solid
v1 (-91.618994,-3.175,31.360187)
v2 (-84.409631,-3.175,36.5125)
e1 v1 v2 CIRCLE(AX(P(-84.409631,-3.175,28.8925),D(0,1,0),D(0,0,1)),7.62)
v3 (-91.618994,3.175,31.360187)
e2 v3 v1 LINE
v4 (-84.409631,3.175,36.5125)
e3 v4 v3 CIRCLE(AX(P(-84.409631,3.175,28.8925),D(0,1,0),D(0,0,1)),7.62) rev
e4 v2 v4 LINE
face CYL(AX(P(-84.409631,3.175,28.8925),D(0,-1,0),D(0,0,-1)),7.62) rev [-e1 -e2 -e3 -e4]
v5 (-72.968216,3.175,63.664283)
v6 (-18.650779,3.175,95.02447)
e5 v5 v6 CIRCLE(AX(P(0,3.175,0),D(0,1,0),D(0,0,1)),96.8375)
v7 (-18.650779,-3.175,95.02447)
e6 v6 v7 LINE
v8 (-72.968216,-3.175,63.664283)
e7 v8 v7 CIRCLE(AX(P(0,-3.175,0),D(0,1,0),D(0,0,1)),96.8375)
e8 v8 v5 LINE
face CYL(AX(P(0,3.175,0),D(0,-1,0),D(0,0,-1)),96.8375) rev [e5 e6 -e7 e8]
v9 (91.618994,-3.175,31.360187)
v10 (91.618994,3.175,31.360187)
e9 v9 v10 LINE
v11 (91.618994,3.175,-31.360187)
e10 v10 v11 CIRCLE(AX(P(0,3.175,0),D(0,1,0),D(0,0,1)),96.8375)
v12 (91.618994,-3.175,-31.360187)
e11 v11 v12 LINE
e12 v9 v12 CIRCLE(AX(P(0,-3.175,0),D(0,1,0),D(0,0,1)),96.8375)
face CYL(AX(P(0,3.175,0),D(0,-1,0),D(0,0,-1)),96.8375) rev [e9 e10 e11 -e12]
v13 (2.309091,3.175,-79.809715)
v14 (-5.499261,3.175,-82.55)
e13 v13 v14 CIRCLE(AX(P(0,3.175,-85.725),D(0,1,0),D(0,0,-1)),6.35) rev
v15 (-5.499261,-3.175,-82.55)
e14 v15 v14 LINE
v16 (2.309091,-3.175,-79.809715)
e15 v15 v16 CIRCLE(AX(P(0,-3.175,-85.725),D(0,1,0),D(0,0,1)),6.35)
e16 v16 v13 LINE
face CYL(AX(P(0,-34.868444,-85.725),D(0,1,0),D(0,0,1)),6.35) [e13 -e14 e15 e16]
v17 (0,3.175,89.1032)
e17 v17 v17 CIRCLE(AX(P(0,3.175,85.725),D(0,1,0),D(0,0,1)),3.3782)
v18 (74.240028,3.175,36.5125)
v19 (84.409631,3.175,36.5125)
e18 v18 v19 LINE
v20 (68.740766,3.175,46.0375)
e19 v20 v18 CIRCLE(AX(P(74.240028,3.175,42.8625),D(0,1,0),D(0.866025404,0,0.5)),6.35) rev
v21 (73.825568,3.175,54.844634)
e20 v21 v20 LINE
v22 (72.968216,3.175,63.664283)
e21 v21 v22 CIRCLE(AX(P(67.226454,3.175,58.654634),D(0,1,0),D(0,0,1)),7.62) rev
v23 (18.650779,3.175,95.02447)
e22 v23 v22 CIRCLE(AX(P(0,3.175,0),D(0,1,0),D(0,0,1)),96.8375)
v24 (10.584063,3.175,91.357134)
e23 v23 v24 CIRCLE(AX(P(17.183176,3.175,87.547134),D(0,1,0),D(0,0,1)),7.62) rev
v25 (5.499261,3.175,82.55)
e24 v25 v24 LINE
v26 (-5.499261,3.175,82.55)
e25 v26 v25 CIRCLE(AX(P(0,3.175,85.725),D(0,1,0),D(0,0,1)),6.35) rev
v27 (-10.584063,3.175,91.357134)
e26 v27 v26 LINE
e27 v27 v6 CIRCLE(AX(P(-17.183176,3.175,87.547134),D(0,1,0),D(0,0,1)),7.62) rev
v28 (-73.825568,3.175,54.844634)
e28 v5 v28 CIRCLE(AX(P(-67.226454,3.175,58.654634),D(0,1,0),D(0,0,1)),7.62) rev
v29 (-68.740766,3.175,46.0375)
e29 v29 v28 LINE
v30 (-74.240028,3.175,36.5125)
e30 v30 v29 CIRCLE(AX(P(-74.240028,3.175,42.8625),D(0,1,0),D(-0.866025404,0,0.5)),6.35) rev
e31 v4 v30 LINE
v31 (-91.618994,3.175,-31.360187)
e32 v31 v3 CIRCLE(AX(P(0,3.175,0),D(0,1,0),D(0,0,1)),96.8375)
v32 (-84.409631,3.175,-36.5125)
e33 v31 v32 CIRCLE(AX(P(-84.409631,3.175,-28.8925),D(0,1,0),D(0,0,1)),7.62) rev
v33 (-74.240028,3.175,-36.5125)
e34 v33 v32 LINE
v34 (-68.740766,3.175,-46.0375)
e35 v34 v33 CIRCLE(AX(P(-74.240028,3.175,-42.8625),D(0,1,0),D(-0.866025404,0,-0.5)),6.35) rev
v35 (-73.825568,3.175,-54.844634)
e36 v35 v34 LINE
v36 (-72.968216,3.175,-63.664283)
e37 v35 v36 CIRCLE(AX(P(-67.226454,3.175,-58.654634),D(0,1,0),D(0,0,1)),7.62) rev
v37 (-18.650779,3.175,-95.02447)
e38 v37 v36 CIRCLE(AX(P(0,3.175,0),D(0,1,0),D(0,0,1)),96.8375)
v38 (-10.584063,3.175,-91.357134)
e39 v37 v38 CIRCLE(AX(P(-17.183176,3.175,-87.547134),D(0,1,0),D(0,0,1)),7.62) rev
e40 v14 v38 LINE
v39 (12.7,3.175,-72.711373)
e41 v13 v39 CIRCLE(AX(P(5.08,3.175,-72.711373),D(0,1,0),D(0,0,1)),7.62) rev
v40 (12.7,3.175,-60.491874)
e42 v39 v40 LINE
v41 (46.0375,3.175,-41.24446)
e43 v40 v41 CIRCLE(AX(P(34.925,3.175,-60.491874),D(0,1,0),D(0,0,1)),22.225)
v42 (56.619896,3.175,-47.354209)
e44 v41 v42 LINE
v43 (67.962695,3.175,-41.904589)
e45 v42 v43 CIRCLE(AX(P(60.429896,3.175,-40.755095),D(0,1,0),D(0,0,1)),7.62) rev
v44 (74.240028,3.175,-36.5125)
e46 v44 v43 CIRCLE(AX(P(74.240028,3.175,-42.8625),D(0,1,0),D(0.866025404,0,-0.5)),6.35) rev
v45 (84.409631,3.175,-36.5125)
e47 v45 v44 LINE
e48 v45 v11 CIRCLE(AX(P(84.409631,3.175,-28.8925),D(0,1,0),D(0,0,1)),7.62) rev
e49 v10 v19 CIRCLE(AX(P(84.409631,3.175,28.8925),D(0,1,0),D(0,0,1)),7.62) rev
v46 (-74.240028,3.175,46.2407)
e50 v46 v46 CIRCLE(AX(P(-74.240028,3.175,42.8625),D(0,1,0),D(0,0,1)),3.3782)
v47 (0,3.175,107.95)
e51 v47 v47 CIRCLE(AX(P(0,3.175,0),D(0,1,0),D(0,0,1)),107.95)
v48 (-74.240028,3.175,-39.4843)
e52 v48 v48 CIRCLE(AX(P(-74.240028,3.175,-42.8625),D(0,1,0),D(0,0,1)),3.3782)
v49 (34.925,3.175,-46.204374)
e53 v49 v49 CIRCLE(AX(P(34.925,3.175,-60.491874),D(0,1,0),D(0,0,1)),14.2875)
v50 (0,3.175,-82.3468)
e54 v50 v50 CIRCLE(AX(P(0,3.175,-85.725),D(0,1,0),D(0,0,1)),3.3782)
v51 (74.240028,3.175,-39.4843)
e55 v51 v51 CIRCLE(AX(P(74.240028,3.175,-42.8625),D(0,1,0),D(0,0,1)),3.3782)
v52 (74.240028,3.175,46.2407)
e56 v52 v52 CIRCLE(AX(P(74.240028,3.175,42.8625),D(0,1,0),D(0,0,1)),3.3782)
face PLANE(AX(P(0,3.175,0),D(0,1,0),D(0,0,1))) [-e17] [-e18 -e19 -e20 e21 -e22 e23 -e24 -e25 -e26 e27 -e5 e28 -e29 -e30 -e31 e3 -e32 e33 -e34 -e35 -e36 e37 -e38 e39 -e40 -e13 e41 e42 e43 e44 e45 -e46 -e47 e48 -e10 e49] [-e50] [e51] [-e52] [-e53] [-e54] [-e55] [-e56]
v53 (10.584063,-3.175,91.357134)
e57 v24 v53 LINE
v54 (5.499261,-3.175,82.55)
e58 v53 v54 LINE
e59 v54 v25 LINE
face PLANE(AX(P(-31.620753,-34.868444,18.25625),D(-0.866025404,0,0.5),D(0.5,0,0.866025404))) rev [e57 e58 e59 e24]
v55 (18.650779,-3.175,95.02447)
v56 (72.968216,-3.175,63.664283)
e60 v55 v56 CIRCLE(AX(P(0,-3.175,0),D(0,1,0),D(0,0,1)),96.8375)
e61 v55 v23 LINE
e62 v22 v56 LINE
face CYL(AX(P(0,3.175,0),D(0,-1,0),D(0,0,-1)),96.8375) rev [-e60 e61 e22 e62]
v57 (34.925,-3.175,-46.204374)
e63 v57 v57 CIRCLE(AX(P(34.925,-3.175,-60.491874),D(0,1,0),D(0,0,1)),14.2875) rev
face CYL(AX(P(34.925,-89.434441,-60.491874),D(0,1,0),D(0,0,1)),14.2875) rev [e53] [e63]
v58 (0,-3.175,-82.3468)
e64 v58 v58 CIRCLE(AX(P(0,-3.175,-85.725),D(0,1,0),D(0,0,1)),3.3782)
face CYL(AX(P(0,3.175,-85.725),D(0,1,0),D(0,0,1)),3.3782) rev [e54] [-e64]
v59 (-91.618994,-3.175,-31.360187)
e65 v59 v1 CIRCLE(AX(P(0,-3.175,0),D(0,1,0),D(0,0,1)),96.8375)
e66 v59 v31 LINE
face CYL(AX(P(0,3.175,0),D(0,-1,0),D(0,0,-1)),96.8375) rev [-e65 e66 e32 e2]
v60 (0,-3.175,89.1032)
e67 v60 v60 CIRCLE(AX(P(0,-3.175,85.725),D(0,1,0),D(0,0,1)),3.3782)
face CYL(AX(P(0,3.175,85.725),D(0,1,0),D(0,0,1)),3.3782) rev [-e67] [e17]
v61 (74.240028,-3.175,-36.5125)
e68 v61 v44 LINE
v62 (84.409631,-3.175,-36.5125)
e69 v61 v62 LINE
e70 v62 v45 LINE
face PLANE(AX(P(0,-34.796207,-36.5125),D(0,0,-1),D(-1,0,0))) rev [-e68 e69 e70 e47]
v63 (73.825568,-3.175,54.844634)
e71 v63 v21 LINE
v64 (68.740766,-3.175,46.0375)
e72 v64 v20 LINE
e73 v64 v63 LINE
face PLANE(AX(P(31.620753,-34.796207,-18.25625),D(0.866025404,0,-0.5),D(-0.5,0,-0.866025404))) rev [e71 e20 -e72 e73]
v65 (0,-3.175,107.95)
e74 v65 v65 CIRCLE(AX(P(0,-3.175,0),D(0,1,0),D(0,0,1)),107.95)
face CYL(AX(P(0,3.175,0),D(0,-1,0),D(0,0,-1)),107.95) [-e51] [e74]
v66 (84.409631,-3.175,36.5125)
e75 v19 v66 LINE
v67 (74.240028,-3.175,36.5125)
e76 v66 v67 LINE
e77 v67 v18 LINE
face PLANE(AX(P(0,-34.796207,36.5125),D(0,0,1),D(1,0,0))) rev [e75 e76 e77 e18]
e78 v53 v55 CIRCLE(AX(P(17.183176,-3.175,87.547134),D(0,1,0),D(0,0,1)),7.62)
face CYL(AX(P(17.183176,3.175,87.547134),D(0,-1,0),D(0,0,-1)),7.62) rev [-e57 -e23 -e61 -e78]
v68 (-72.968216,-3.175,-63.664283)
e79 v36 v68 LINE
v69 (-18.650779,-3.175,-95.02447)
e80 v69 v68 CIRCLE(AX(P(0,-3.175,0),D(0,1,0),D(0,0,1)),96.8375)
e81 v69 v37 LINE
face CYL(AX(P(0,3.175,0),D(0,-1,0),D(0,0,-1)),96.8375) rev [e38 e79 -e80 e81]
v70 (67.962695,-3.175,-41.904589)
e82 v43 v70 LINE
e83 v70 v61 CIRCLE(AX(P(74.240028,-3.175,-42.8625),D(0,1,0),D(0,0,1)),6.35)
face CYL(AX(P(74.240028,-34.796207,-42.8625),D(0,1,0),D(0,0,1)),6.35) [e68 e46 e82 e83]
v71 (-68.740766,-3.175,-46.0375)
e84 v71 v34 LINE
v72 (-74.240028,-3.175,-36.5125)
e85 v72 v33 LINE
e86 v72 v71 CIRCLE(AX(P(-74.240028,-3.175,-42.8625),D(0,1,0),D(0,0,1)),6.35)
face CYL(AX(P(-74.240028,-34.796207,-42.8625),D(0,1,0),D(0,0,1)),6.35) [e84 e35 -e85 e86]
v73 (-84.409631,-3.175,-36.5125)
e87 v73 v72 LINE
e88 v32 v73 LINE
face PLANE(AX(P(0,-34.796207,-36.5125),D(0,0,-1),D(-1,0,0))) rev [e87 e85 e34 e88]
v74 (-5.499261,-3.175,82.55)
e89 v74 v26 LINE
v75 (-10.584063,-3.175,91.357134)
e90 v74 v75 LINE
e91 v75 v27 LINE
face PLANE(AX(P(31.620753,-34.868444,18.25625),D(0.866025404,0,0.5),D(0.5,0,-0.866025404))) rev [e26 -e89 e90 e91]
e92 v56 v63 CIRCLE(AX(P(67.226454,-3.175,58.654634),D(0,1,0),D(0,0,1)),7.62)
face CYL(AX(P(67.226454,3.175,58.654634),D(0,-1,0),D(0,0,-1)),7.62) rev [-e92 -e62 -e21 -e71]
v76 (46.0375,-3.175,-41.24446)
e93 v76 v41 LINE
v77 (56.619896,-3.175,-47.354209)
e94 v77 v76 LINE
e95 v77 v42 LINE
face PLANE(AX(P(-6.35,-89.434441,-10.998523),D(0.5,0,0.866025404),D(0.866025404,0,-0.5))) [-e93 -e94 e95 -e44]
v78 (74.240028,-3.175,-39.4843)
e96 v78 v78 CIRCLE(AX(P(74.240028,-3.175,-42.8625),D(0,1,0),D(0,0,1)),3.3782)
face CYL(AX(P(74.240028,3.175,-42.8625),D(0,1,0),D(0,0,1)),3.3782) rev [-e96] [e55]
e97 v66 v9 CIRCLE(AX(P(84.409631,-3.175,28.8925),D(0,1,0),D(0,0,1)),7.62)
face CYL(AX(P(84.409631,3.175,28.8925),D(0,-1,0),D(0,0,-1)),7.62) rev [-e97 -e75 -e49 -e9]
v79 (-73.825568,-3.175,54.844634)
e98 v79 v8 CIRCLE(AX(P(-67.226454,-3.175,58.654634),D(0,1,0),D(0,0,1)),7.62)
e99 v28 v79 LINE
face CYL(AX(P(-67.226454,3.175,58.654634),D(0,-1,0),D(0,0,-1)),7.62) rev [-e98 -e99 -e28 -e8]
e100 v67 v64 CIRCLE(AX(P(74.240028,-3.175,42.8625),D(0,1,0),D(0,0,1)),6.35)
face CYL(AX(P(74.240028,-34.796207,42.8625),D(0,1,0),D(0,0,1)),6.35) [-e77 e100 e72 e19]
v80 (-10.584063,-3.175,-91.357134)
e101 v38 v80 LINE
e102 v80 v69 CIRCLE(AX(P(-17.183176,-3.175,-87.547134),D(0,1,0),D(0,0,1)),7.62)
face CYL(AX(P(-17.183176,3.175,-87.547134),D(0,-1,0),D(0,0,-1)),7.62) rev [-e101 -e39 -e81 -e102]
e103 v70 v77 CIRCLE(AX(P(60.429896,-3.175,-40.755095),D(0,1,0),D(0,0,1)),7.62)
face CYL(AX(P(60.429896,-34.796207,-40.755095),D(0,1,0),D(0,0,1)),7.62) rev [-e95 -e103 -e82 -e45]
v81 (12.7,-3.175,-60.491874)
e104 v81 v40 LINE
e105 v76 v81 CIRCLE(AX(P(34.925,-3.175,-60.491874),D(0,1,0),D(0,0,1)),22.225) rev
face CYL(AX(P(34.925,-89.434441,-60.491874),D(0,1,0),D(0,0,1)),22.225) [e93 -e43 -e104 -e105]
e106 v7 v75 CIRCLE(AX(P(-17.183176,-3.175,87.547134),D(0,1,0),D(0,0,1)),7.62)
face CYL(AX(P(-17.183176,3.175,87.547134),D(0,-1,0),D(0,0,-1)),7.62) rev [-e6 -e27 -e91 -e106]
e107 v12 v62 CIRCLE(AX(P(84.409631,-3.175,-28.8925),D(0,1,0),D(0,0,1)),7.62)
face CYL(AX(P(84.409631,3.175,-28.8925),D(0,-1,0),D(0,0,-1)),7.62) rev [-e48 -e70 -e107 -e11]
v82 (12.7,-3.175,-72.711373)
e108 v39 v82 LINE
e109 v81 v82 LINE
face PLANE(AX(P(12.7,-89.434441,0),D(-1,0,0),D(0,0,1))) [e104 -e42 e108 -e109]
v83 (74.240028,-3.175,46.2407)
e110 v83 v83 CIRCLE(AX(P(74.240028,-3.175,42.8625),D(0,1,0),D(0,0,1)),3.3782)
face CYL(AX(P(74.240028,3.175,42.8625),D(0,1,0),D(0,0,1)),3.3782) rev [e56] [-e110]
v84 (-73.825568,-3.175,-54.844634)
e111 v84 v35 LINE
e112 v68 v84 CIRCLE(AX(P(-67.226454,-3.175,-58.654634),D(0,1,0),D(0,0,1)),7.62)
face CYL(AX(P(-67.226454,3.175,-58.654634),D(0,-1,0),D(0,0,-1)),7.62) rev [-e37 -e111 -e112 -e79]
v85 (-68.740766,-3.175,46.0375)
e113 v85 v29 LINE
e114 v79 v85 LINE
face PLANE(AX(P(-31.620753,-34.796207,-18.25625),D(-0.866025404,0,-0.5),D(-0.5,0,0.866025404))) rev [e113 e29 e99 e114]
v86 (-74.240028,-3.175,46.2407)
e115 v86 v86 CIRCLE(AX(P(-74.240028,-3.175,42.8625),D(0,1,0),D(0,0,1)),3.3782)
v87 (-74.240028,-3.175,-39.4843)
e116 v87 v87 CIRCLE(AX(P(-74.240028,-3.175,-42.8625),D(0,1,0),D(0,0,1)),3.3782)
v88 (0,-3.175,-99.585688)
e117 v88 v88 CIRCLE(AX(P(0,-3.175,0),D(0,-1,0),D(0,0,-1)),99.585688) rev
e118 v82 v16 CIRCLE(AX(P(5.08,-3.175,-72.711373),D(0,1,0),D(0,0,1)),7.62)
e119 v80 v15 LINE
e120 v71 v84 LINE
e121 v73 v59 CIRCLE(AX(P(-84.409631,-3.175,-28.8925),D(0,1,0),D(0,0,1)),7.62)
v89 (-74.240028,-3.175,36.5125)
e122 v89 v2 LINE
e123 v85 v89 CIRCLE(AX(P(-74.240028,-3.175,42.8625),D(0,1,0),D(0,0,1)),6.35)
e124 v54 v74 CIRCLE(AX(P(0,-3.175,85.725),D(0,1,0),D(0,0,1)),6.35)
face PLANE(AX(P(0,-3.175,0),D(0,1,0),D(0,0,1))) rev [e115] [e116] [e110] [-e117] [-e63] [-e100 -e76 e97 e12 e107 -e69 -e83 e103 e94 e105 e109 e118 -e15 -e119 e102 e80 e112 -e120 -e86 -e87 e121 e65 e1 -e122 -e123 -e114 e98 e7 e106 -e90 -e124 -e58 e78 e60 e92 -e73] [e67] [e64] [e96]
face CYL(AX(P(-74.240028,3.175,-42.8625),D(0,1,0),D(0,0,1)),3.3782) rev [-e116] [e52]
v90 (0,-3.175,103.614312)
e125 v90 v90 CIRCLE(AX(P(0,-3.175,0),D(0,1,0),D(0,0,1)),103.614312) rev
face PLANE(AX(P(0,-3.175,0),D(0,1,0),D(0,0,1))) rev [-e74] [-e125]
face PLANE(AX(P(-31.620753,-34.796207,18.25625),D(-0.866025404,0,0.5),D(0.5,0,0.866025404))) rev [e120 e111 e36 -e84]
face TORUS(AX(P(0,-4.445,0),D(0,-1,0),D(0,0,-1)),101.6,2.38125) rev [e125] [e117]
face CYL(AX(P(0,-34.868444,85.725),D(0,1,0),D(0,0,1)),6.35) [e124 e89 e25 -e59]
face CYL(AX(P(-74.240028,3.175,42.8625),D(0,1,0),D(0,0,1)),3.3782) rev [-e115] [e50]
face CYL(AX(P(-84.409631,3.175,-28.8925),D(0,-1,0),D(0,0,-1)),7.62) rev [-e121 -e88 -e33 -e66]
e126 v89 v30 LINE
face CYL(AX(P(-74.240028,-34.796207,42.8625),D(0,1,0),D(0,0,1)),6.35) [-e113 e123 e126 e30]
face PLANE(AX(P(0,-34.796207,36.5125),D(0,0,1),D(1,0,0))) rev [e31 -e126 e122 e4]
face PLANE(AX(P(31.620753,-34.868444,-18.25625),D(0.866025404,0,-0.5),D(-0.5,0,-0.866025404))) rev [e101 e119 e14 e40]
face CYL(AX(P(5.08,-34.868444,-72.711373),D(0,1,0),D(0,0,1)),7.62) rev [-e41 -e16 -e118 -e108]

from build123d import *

# Parameters (mm, degrees)
SKETCH1_R                   = 107.95
SKETCH1_R_2                 = 96.8375
BOSS_EXTRUDE1_DEPTH         = 3.175
SKETCH2_R                   = 2.38125
BOSS_EXTRUDE2_START         = -6.35
BOSS_EXTRUDE2_DEPTH         = 6.35
BOSS_EXTRUDE3_START         = -6.35
SKETCH7_R                   = 14.2875
BOSS_EXTRUDE3_DEPTH         = 6.35
FILLET1_R                   = 7.62
CIRPATTERN1_START           = -3.175
CIRPATTERN1_DEPTH           = 6.35
F_1_4_CLEARANCE_HOLE1_D     = 6.7564
F_1_4_CLEARANCE_HOLE1_DEPTH = 9.398
F_1_4_CLEARANCE_HOLE1_TIP   = 2.029827343
FILLET2_R                   = 7.62


# Read off the part's stored shape, not the designer's step: CirPattern1
with BuildPart() as part:
    # Sketch1 → Boss-Extrude1 (new, symmetric)
    with BuildSketch(Plane(origin=(0, 0, 0), x_dir=(1, 0, 0), z_dir=(0, 1, 0))):
        with Locations(Location((0, 0, 0), (0, 0, 270))):
            Circle(SKETCH1_R)
        with Locations(Location((0, 0, 0), (0, 0, 270))):
            Circle(SKETCH1_R_2, mode=Mode.SUBTRACT)
    extrude(amount=BOSS_EXTRUDE1_DEPTH, both=True)

    # Sketch2 → Cut-Revolve1 (revolve, cut)
    with BuildSketch(Plane(origin=(0, 0, 0), x_dir=(0, 0, -1), z_dir=(1, 0, 0)), mode=Mode.PRIVATE) as cut_revolve1_sk:
        with Locations((-101.6, -4.445)):
            Circle(SKETCH2_R)
    revolve(cut_revolve1_sk.sketch.rotate(Axis((0, -31.187956177, 0), (0, 1, 0)), 180), axis=Axis((0, -31.187956177, 0), (0, 1, 0)), mode=Mode.SUBTRACT)

    # Sketch3 → Boss-Extrude2 (add)
    with BuildSketch(Plane(origin=(0, 3.175, 0), x_dir=(1, 0, 0), z_dir=(0, 1, 0)).offset(BOSS_EXTRUDE2_START)):
        with BuildLine():
            Line((-5.499261314, -82.55), (-13.224366326, -95.930274374))
            ThreePointArc((-13.224366326, -95.930274374), (0, -96.8375), (13.224366326, -95.930274374))
            Line((13.224366326, -95.930274374), (5.499261314, -82.55))
            ThreePointArc((5.499261314, -82.55), (0, -79.375), (-5.499261314, -82.55))
        make_face()
    extrude(amount=BOSS_EXTRUDE2_DEPTH)

    # Sketch7 → Boss-Extrude3 (add)
    with BuildSketch(Plane(origin=(0, 3.175, 0), x_dir=(1, 0, 0), z_dir=(0, 1, 0)).offset(BOSS_EXTRUDE3_START)):
        with BuildLine():
            ThreePointArc((76.789392316, 58.999073162), (48.41875, 83.863735039), (12.7, 96.001101068))
            Line((12.7, 96.001101068), (12.7, 60.491874454))
            ThreePointArc((12.7, 60.491874454), (23.8125, 41.244459855), (46.0375, 41.244459855))
            Line((46.0375, 41.244459855), (76.789392316, 58.999073162))
        make_face()
        with Locations(Location((34.925, 60.491874454, 0), (0, 0, 270))):
            Circle(SKETCH7_R, mode=Mode.SUBTRACT)
    extrude(amount=BOSS_EXTRUDE3_DEPTH)

    # Fillet1
    fillet1_edges = [part.edges().sort_by_distance(p)[0] for p in [
        (-13.224366326, 0, 95.930274374),
        (13.224366326, 0, 95.930274374),
    ]]
    fillet(fillet1_edges, radius=FILLET1_R)

    # CirPattern1 outline → CirPattern1 (add)
    with BuildSketch(Plane(origin=(0, 0, 0), x_dir=(1, 0, 0), z_dir=(0, 1, 0)).offset(CIRPATTERN1_START)):
        with BuildLine():
            ThreePointArc((72.968215537, -63.664282982), (83.863735039, -48.41875), (91.618994144, -31.360186833))
            ThreePointArc((91.618994144, -31.360186833), (88.840241596, -35.092023113), (84.409630671, -36.5125))
            Line((84.409630671, -36.5125), (74.240027739, -36.5125))
            ThreePointArc((74.240027739, -36.5125), (68.740766425, -39.6875), (68.740766425, -46.0375))
            Line((68.740766425, -46.0375), (73.825567891, -54.844634485))
            ThreePointArc((73.825567891, -54.844634485), (74.810704284, -59.391894543), (72.968215537, -63.664282982))
        make_face()
        with BuildLine():
            Line((75.941505111, 58.509545256), (68.740766425, 46.0375))
            ThreePointArc((68.740766425, 46.0375), (68.740766425, 39.6875), (74.240027739, 36.5125))
            Line((74.240027739, 36.5125), (84.409630671, 36.5125))
            ThreePointArc((84.409630671, 36.5125), (88.840241596, 35.092023113), (91.618994145, 31.360186833))
            ThreePointArc((91.618994145, 31.360186833), (85.330669556, 45.784039133), (76.789392316, 58.999073162))
            Line((76.789392316, 58.999073162), (75.941505111, 58.509545256))
        make_face()
        with BuildLine():
            ThreePointArc((-84.409630671, -36.5125), (-88.840241596, -35.092023113), (-91.618994145, -31.360186833))
            ThreePointArc((-91.618994145, -31.360186833), (-83.863735039, -48.41875), (-72.968215537, -63.664282982))
            ThreePointArc((-72.968215537, -63.664282982), (-74.810704284, -59.391894543), (-73.825567891, -54.844634485))
            Line((-73.825567891, -54.844634485), (-68.740766425, -46.0375))
            ThreePointArc((-68.740766425, -46.0375), (-68.740766425, -39.6875), (-74.240027739, -36.5125))
            Line((-74.240027739, -36.5125), (-84.409630671, -36.5125))
        make_face()
        with BuildLine():
            ThreePointArc((12.7, 96.001101068), (-3.015193802, 96.790547124), (-18.650778608, 95.024469815))
            ThreePointArc((-18.650778608, 95.024469815), (-14.029537312, 94.483917657), (-10.58406278, 91.357134485))
            Line((-10.58406278, 91.357134485), (-5.499261314, 82.55))
            ThreePointArc((-5.499261314, 82.55), (0, 79.375), (5.499261314, 82.55))
            Line((5.499261314, 82.55), (12.7, 95.022045256))
            Line((12.7, 95.022045256), (12.7, 96.001101068))
        make_face()
        with BuildLine():
            Line((-68.740766425, 46.0375), (-73.825567891, 54.844634485))
            ThreePointArc((-73.825567891, 54.844634485), (-74.810704284, 59.391894543), (-72.968215537, 63.664282982))
            ThreePointArc((-72.968215537, 63.664282982), (-83.863735039, 48.41875), (-91.618994145, 31.360186833))
            ThreePointArc((-91.618994145, 31.360186833), (-88.840241596, 35.092023113), (-84.409630671, 36.5125))
            Line((-84.409630671, 36.5125), (-74.240027739, 36.5125))
            ThreePointArc((-74.240027739, 36.5125), (-68.740766425, 39.6875), (-68.740766425, 46.0375))
        make_face()
    extrude(amount=CIRPATTERN1_DEPTH)

    # 1/4 Clearance Hole1
    with Locations(Plane(origin=(0, 3.175, 0), x_dir=(1, 0, 0), z_dir=(0, 1, 0))):
        with Locations((0, -85.725), (74.240027739, -42.8625), (74.240027739, 42.8625), (-74.240027739, 42.8625), (-74.240027739, -42.8625), (0, 85.725)):
            Hole(F_1_4_CLEARANCE_HOLE1_D / 2, depth=F_1_4_CLEARANCE_HOLE1_DEPTH)
            with Locations((0, 0, -(F_1_4_CLEARANCE_HOLE1_DEPTH + F_1_4_CLEARANCE_HOLE1_TIP / 2))):  # 118° drill point
                Cone(0, F_1_4_CLEARANCE_HOLE1_D / 2, F_1_4_CLEARANCE_HOLE1_TIP, mode=Mode.SUBTRACT)

    # Fillet2
    fillet2_edges = [part.edges().sort_by_distance(p)[0] for p in [
        (75.941505111, 0, -58.509545256),
        (12.7, 0, -95.022045256),
    ]]
    fillet(fillet2_edges, radius=FILLET2_R)


solid = part.part
